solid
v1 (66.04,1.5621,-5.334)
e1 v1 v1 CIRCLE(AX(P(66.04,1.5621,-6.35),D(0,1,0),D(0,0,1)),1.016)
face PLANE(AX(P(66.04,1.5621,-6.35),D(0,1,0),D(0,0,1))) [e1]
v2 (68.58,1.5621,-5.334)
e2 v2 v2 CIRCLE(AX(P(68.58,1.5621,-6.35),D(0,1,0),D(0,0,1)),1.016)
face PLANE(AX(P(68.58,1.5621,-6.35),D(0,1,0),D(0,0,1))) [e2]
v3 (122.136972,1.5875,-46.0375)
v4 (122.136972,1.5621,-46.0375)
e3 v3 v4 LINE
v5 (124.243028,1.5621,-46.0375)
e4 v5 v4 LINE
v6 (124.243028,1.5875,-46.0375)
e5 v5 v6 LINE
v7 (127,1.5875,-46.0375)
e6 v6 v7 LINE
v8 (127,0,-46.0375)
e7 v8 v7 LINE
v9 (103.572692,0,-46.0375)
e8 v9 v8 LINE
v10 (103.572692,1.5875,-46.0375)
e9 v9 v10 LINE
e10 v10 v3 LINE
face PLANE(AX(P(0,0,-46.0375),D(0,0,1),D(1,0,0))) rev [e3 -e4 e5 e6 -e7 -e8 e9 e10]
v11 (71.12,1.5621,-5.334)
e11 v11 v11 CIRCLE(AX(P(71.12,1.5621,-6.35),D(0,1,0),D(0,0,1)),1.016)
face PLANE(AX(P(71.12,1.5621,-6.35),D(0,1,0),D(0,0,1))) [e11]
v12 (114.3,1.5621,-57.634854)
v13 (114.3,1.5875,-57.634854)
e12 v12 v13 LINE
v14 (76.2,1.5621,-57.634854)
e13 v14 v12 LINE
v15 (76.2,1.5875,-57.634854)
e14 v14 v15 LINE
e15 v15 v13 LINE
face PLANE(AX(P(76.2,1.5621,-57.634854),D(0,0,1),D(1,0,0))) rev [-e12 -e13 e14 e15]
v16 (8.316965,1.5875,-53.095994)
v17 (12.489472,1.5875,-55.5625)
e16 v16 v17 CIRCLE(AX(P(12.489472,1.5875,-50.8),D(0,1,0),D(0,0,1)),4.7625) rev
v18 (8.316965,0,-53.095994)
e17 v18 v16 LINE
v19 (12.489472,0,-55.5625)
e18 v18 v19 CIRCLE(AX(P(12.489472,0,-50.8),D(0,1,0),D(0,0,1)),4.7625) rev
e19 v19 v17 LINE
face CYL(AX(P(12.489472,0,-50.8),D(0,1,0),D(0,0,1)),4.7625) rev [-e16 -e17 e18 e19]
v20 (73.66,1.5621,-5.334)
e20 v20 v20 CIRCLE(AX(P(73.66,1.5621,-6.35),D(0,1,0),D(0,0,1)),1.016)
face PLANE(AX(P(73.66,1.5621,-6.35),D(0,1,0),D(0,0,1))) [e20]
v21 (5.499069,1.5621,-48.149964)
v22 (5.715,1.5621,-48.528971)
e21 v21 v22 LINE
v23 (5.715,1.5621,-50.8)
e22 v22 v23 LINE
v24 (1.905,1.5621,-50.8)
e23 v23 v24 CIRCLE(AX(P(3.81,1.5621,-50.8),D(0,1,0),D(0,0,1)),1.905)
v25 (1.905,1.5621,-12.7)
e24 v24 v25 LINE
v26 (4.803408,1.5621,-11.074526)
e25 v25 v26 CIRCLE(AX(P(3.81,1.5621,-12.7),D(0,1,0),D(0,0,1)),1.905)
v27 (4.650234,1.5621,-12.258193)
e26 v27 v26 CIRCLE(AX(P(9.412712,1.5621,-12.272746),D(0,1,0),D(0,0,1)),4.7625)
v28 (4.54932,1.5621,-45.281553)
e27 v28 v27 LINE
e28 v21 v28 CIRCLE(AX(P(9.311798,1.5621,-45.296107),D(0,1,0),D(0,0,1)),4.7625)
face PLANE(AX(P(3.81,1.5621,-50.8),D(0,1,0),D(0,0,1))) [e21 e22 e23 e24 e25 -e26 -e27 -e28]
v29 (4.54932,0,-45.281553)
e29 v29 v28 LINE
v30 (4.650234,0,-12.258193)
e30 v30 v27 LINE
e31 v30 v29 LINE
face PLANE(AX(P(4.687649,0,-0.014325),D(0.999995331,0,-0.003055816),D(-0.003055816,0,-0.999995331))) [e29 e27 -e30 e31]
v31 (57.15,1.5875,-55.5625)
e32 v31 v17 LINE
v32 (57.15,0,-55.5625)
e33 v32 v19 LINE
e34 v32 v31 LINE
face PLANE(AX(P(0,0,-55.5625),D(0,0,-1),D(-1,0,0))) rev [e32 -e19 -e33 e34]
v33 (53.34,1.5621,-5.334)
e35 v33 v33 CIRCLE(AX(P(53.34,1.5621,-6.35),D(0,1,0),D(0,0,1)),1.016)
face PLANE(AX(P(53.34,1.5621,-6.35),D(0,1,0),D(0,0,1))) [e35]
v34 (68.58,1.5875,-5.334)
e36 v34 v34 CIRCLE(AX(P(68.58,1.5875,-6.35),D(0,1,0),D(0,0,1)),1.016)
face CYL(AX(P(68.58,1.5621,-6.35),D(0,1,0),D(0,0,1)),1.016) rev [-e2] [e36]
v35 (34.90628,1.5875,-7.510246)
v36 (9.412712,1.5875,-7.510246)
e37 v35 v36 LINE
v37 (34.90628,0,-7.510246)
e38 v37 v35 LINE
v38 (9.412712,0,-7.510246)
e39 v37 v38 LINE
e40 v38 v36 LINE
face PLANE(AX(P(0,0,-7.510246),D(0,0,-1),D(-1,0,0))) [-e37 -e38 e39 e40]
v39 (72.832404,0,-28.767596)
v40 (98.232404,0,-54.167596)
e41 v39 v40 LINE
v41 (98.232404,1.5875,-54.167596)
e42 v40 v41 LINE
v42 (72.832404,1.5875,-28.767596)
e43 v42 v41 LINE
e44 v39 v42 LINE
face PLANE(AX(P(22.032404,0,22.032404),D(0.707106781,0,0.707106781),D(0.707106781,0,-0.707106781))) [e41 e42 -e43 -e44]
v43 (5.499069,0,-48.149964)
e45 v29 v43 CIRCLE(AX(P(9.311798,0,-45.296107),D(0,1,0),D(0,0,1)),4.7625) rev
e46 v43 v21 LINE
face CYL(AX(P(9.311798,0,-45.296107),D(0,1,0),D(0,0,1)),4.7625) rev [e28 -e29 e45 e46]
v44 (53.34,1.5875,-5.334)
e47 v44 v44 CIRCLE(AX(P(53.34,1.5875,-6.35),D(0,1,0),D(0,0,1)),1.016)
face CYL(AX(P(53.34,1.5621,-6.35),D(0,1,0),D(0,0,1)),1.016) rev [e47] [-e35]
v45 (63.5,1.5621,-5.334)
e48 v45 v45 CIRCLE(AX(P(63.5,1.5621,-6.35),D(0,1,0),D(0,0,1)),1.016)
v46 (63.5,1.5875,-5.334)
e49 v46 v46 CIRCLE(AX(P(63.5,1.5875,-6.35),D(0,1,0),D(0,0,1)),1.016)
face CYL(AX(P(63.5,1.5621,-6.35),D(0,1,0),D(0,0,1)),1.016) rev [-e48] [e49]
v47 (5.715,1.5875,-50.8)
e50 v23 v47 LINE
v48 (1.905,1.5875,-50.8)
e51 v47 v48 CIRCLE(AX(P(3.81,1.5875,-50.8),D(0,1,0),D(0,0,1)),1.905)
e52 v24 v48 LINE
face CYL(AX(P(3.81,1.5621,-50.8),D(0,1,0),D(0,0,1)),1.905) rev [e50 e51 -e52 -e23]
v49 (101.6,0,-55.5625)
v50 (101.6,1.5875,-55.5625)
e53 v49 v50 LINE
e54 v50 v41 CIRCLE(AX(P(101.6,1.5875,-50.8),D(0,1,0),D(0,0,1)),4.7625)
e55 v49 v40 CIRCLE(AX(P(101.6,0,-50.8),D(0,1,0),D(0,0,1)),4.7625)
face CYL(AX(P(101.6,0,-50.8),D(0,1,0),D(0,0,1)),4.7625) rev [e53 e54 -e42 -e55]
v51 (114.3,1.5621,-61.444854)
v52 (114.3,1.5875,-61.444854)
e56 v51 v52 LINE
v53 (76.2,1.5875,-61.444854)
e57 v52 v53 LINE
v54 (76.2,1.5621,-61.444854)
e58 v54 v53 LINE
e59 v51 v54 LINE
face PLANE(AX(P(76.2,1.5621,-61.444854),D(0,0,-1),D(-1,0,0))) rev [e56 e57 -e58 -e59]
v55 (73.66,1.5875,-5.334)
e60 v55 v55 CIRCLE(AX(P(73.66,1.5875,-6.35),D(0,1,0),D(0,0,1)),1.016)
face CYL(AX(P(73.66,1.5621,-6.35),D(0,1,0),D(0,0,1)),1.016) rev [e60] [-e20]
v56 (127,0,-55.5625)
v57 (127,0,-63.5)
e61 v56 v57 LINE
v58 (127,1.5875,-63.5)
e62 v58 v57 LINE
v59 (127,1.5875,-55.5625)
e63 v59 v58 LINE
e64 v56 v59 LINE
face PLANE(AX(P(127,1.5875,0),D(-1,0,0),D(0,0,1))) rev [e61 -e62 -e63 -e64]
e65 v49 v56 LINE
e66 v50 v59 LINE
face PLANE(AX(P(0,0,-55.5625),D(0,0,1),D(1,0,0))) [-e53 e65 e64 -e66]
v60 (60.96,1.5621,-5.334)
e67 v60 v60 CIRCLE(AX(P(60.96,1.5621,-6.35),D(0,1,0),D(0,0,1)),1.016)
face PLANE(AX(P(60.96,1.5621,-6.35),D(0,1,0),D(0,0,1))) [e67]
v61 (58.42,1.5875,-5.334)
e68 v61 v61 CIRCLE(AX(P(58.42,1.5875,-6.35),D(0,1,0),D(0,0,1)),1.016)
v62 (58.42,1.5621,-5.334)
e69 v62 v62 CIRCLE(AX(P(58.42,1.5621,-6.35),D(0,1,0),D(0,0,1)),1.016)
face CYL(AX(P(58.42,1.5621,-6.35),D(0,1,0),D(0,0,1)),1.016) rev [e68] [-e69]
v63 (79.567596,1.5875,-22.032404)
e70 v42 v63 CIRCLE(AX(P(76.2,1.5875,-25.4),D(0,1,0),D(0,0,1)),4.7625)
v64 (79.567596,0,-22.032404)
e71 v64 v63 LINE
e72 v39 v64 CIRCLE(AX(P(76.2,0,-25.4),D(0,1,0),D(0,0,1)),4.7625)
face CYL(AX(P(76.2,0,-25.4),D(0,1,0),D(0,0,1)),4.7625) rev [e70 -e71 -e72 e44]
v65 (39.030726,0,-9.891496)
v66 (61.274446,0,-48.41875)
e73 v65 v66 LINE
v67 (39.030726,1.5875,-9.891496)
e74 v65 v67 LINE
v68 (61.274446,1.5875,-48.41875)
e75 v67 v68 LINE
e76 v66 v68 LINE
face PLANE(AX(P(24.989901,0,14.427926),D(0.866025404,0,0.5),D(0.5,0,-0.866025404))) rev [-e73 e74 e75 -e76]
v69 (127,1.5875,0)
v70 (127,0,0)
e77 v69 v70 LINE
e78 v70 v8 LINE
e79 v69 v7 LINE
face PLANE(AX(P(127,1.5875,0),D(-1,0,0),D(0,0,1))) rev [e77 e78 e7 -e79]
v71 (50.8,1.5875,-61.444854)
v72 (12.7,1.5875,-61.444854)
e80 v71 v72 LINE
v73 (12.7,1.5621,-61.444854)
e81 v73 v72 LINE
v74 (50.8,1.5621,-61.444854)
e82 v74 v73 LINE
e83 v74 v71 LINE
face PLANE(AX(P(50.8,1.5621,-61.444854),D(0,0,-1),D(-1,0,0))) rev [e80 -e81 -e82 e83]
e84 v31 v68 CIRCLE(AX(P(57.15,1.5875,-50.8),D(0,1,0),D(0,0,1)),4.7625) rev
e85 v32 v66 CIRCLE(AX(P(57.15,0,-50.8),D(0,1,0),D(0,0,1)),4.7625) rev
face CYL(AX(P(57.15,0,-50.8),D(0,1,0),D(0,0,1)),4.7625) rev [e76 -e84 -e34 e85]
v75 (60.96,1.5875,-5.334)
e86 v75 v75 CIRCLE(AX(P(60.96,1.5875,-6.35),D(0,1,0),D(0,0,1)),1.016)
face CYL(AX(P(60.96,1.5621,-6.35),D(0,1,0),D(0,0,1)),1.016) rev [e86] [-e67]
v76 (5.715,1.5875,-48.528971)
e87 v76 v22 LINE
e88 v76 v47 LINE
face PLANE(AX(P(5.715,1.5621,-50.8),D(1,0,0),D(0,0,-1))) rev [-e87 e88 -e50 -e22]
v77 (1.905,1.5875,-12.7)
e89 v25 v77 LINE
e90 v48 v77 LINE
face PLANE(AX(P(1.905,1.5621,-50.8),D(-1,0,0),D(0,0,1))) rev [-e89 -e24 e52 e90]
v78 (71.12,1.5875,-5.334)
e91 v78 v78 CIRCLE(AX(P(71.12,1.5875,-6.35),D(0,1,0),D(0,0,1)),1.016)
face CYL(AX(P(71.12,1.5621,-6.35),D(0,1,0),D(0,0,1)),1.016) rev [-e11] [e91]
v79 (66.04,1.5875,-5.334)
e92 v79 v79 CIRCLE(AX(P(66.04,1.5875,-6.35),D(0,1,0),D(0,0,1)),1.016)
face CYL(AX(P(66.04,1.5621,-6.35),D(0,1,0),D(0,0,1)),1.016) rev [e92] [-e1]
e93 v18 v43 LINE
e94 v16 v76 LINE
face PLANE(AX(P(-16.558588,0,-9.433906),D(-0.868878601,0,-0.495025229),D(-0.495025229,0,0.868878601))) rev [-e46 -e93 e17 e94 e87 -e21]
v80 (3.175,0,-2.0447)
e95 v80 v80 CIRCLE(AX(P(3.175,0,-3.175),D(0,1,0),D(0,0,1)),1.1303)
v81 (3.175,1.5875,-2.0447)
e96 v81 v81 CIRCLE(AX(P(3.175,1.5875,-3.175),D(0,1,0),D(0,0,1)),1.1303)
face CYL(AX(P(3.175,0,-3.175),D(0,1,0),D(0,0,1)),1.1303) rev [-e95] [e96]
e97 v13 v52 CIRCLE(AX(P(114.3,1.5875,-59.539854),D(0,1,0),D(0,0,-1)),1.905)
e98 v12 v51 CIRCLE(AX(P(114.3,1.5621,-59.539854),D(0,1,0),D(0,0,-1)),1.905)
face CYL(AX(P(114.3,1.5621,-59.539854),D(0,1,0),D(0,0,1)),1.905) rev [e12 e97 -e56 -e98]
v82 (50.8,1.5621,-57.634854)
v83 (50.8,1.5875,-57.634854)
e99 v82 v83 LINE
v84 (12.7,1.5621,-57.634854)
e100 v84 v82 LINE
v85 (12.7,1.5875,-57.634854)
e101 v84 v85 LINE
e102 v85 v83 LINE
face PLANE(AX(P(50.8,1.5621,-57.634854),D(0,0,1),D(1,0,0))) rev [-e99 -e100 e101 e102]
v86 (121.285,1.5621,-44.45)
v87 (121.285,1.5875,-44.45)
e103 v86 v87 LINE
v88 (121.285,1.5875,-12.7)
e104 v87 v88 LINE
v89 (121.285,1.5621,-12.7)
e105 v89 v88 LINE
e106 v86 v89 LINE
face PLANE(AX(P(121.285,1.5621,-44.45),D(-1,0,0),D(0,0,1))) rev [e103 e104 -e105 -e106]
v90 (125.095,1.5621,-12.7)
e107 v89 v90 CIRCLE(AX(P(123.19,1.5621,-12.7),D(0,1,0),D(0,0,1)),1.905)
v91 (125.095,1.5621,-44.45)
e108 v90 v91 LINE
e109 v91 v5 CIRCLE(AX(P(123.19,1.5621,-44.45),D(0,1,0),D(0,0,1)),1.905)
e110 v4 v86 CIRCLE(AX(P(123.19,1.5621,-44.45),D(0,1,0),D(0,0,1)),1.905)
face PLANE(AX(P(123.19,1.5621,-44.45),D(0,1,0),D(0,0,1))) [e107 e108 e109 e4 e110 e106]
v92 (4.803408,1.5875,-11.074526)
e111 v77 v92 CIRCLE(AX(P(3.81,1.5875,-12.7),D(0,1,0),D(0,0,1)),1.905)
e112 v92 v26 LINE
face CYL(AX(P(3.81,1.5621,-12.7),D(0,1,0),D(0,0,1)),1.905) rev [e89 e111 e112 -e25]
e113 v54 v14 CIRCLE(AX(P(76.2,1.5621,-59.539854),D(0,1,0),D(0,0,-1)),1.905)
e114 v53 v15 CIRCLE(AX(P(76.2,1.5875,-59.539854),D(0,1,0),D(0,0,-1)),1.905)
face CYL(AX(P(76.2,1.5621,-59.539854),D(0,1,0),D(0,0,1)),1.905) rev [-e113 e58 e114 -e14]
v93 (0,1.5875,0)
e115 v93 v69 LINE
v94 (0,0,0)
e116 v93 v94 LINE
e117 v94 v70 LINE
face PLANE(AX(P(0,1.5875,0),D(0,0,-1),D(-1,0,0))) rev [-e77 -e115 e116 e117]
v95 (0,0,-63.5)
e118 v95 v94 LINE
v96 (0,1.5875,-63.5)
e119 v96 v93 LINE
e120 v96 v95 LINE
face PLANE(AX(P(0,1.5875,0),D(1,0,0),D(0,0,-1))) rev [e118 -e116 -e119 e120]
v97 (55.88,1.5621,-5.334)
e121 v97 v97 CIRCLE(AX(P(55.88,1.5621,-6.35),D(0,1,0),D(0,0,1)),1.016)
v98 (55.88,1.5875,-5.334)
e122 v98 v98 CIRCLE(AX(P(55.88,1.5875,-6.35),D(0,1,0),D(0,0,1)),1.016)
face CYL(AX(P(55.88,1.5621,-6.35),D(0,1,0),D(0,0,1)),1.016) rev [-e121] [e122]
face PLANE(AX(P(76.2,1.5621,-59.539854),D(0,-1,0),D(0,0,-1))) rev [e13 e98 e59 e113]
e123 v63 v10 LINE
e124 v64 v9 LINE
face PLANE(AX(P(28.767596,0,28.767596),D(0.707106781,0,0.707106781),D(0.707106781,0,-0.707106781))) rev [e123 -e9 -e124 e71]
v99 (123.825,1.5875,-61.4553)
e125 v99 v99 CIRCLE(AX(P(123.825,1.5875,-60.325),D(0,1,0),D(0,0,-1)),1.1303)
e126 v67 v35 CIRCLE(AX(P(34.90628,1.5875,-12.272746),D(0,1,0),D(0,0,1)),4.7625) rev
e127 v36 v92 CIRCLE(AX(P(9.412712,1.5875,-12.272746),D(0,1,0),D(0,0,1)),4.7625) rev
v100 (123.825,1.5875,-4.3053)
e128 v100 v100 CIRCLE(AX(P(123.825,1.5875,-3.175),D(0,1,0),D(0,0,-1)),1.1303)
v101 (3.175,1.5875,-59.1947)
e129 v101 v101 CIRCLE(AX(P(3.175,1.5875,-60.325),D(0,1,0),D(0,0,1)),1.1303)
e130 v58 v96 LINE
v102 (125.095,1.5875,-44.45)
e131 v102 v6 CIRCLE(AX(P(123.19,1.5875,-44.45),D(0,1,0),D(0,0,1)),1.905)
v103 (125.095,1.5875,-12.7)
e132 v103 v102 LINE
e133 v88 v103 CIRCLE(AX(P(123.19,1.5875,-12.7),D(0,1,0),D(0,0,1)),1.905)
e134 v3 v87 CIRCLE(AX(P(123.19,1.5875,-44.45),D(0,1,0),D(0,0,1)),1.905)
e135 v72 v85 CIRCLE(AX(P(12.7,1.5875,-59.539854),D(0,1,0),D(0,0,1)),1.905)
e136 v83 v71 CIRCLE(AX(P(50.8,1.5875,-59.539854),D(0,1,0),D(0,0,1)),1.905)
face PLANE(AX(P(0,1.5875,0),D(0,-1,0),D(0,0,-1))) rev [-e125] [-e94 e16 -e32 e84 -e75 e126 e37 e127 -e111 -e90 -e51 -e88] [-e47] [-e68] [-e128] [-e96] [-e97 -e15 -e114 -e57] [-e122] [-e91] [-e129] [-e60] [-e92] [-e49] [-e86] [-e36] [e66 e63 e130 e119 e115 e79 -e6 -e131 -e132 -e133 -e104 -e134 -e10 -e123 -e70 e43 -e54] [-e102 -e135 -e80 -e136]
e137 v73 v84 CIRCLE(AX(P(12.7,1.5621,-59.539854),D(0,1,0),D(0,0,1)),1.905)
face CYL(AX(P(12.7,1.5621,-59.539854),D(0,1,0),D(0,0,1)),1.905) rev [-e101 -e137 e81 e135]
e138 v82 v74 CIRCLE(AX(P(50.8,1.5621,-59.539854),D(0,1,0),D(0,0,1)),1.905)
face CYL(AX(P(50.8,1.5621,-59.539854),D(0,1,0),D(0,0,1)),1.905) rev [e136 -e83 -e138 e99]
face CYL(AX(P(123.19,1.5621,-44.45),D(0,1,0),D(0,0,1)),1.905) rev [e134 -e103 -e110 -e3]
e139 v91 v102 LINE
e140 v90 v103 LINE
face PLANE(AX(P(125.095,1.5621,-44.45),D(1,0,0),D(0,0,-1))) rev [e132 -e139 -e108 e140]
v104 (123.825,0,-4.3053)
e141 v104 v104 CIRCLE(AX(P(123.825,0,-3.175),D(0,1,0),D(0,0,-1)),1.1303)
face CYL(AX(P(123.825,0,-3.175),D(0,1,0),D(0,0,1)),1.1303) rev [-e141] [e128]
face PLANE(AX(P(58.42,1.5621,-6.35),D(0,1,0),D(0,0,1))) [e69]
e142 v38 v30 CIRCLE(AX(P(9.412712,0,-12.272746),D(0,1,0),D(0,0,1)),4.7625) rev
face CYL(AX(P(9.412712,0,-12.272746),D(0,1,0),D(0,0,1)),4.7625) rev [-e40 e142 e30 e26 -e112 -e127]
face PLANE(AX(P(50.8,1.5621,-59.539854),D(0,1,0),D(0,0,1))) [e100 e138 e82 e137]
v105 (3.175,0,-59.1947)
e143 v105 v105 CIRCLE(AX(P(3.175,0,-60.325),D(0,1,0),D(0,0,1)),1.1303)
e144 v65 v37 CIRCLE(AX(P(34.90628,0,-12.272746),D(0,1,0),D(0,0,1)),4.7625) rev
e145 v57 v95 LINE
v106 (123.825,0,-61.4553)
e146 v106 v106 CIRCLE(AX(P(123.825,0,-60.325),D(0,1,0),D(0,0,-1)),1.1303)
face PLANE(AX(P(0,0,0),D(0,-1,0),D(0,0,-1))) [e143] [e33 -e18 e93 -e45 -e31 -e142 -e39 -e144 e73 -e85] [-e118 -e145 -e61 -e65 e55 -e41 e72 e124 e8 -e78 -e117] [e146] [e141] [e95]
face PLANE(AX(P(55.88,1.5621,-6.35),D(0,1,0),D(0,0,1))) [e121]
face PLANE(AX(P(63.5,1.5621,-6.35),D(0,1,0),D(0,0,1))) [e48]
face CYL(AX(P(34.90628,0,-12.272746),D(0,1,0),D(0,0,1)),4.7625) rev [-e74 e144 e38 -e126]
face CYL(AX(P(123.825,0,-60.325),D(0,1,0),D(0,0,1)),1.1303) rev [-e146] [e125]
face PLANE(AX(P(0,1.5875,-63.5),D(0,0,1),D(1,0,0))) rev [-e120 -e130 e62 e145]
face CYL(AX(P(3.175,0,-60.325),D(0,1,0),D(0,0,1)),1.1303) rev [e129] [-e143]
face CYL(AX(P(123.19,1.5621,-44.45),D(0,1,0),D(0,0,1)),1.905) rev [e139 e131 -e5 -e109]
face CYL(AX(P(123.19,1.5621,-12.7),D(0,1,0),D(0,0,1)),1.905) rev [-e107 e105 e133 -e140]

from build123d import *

# Parameters (mm, degrees)
SKETCH1_W           = 127
SKETCH1_H           = 63.5
BOSS_EXTRUDE1_DEPTH = 1.5875
SKETCH2_R           = 1.1303
CUT_EXTRUDE1_DEPTH  = 142.999190689
CUT_EXTRUDE2_DEPTH  = 1.5875
CUT_EXTRUDE3_DEPTH  = 1.5875
SKETCH3_R           = 1.016
CUT_EXTRUDE4_DEPTH  = 0.0254


with BuildPart() as part:
    # Sketch1 → Boss-Extrude1 (new body)
    with BuildSketch(Plane(origin=(0, 0, 0), x_dir=(1, 0, 0), z_dir=(0, 1, 0))):
        with Locations((63.5, 31.75)):
            Rectangle(SKETCH1_W, SKETCH1_H)
    extrude(amount=BOSS_EXTRUDE1_DEPTH)

    # Sketch2 → Cut-Extrude1 (cut, through all)
    with BuildSketch(Plane(origin=(0, 1.5875, 0), x_dir=(1, 0, 0), z_dir=(0, 1, 0))):
        with Locations((3.175, 60.325)):
            Circle(SKETCH2_R)
        with Locations((3.175, 3.175)):
            Circle(SKETCH2_R)
        with Locations((123.825, 3.175)):
            Circle(SKETCH2_R)
        with Locations((123.825, 60.325)):
            Circle(SKETCH2_R)
    extrude(amount=-CUT_EXTRUDE1_DEPTH, mode=Mode.SUBTRACT)

    # Sketch4 → Cut-Extrude2 (cut)
    with BuildSketch(Plane(origin=(0, 1.5875, 0), x_dir=(1, 0, 0), z_dir=(0, 1, 0))):
        with BuildLine():
            Line((98.232403955, 54.167596045), (72.832403955, 28.767596045))
            ThreePointArc((72.832403955, 28.767596045), (72.832403955, 22.032403955), (79.567596045, 22.032403955))
            Line((79.567596045, 22.032403955), (103.572692091, 46.0375))
            Line((103.572692091, 46.0375), (127, 46.0375))
            Line((127, 46.0375), (127, 55.5625))
            Line((127, 55.5625), (101.6, 55.5625))
            ThreePointArc((101.6, 55.5625), (99.777470153, 55.199976274), (98.232403955, 54.167596045))
        make_face()
    extrude(amount=-CUT_EXTRUDE2_DEPTH, mode=Mode.SUBTRACT)

    # Sketch5 → Cut-Extrude3 (cut)
    with BuildSketch(Plane(origin=(0, 1.5875, 0), x_dir=(-1, 0, 0), z_dir=(0, 1, 0))):
        with BuildLine():
            ThreePointArc((-4.650233894, -12.25819272), (-6.050264926, -8.900008545), (-9.412711658, -7.510246043))
            Line((-9.412711658, -7.510246043), (-34.906279557, -7.510246043))
            ThreePointArc((-34.906279557, -7.510246043), (-37.287529557, -8.148300057), (-39.030725542, -9.891496043))
            Line((-39.030725542, -9.891496043), (-61.274445986, -48.41875))
            ThreePointArc((-61.274445986, -48.41875), (-61.274445986, -53.18125), (-57.15, -55.5625))
            Line((-57.15, -55.5625), (-12.489472227, -55.5625))
            ThreePointArc((-12.489472227, -55.5625), (-10.065969168, -54.899760868), (-8.316964929, -53.095994141))
            Line((-8.316964929, -53.095994141), (-5.499068963, -48.1499644))
            ThreePointArc((-5.499068963, -48.1499644), (-4.790682084, -46.79307626), (-4.549320114, -45.281553255))
            Line((-4.549320114, -45.281553255), (-4.650233894, -12.25819272))
        make_face()
    extrude(amount=-CUT_EXTRUDE3_DEPTH, mode=Mode.SUBTRACT)

    # Sketch3 → Cut-Extrude4 (cut)
    with BuildSketch(Plane(origin=(0, 1.5875, 0), x_dir=(1, 0, 0), z_dir=(0, 1, 0))):
        with Locations((63.5, 6.35)):
            Circle(SKETCH3_R)
        with Locations((66.04, 6.35)):
            Circle(SKETCH3_R)
        with Locations((68.58, 6.35)):
            Circle(SKETCH3_R)
        with Locations((71.12, 6.35)):
            Circle(SKETCH3_R)
        with Locations((73.66, 6.35)):
            Circle(SKETCH3_R)
        with Locations((60.96, 6.35)):
            Circle(SKETCH3_R)
        with Locations((58.42, 6.35)):
            Circle(SKETCH3_R)
        with Locations((55.88, 6.35)):
            Circle(SKETCH3_R)
        with Locations((53.34, 6.35)):
            Circle(SKETCH3_R)
        with BuildLine():
            Line((5.715, 50.8), (5.715, 12.7))
            ThreePointArc((5.715, 12.7), (3.81, 10.795), (1.905, 12.7))
            Line((1.905, 12.7), (1.905, 50.8))
            ThreePointArc((1.905, 50.8), (3.81, 52.705), (5.715, 50.8))
        make_face()
        with BuildLine():
            Line((50.8, 57.634853503), (12.7, 57.634853503))
            ThreePointArc((12.7, 57.634853503), (10.795, 59.539853503), (12.7, 61.444853503))
            Line((12.7, 61.444853503), (50.8, 61.444853503))
            ThreePointArc((50.8, 61.444853503), (52.705, 59.539853503), (50.8, 57.634853503))
        make_face()
        with BuildLine():
            Line((76.2, 57.634853503), (114.3, 57.634853503))
            ThreePointArc((114.3, 57.634853503), (116.205, 59.539853503), (114.3, 61.444853503))
            Line((114.3, 61.444853503), (76.2, 61.444853503))
            ThreePointArc((76.2, 61.444853503), (74.295, 59.539853503), (76.2, 57.634853503))
        make_face()
        with BuildLine():
            Line((125.095, 44.45), (125.095, 12.7))
            ThreePointArc((125.095, 12.7), (123.19, 10.795), (121.285, 12.7))
            Line((121.285, 12.7), (121.285, 44.45))
            ThreePointArc((121.285, 44.45), (123.19, 46.355), (125.095, 44.45))
        make_face()
    extrude(amount=-CUT_EXTRUDE4_DEPTH, mode=Mode.SUBTRACT)


solid = part.part
